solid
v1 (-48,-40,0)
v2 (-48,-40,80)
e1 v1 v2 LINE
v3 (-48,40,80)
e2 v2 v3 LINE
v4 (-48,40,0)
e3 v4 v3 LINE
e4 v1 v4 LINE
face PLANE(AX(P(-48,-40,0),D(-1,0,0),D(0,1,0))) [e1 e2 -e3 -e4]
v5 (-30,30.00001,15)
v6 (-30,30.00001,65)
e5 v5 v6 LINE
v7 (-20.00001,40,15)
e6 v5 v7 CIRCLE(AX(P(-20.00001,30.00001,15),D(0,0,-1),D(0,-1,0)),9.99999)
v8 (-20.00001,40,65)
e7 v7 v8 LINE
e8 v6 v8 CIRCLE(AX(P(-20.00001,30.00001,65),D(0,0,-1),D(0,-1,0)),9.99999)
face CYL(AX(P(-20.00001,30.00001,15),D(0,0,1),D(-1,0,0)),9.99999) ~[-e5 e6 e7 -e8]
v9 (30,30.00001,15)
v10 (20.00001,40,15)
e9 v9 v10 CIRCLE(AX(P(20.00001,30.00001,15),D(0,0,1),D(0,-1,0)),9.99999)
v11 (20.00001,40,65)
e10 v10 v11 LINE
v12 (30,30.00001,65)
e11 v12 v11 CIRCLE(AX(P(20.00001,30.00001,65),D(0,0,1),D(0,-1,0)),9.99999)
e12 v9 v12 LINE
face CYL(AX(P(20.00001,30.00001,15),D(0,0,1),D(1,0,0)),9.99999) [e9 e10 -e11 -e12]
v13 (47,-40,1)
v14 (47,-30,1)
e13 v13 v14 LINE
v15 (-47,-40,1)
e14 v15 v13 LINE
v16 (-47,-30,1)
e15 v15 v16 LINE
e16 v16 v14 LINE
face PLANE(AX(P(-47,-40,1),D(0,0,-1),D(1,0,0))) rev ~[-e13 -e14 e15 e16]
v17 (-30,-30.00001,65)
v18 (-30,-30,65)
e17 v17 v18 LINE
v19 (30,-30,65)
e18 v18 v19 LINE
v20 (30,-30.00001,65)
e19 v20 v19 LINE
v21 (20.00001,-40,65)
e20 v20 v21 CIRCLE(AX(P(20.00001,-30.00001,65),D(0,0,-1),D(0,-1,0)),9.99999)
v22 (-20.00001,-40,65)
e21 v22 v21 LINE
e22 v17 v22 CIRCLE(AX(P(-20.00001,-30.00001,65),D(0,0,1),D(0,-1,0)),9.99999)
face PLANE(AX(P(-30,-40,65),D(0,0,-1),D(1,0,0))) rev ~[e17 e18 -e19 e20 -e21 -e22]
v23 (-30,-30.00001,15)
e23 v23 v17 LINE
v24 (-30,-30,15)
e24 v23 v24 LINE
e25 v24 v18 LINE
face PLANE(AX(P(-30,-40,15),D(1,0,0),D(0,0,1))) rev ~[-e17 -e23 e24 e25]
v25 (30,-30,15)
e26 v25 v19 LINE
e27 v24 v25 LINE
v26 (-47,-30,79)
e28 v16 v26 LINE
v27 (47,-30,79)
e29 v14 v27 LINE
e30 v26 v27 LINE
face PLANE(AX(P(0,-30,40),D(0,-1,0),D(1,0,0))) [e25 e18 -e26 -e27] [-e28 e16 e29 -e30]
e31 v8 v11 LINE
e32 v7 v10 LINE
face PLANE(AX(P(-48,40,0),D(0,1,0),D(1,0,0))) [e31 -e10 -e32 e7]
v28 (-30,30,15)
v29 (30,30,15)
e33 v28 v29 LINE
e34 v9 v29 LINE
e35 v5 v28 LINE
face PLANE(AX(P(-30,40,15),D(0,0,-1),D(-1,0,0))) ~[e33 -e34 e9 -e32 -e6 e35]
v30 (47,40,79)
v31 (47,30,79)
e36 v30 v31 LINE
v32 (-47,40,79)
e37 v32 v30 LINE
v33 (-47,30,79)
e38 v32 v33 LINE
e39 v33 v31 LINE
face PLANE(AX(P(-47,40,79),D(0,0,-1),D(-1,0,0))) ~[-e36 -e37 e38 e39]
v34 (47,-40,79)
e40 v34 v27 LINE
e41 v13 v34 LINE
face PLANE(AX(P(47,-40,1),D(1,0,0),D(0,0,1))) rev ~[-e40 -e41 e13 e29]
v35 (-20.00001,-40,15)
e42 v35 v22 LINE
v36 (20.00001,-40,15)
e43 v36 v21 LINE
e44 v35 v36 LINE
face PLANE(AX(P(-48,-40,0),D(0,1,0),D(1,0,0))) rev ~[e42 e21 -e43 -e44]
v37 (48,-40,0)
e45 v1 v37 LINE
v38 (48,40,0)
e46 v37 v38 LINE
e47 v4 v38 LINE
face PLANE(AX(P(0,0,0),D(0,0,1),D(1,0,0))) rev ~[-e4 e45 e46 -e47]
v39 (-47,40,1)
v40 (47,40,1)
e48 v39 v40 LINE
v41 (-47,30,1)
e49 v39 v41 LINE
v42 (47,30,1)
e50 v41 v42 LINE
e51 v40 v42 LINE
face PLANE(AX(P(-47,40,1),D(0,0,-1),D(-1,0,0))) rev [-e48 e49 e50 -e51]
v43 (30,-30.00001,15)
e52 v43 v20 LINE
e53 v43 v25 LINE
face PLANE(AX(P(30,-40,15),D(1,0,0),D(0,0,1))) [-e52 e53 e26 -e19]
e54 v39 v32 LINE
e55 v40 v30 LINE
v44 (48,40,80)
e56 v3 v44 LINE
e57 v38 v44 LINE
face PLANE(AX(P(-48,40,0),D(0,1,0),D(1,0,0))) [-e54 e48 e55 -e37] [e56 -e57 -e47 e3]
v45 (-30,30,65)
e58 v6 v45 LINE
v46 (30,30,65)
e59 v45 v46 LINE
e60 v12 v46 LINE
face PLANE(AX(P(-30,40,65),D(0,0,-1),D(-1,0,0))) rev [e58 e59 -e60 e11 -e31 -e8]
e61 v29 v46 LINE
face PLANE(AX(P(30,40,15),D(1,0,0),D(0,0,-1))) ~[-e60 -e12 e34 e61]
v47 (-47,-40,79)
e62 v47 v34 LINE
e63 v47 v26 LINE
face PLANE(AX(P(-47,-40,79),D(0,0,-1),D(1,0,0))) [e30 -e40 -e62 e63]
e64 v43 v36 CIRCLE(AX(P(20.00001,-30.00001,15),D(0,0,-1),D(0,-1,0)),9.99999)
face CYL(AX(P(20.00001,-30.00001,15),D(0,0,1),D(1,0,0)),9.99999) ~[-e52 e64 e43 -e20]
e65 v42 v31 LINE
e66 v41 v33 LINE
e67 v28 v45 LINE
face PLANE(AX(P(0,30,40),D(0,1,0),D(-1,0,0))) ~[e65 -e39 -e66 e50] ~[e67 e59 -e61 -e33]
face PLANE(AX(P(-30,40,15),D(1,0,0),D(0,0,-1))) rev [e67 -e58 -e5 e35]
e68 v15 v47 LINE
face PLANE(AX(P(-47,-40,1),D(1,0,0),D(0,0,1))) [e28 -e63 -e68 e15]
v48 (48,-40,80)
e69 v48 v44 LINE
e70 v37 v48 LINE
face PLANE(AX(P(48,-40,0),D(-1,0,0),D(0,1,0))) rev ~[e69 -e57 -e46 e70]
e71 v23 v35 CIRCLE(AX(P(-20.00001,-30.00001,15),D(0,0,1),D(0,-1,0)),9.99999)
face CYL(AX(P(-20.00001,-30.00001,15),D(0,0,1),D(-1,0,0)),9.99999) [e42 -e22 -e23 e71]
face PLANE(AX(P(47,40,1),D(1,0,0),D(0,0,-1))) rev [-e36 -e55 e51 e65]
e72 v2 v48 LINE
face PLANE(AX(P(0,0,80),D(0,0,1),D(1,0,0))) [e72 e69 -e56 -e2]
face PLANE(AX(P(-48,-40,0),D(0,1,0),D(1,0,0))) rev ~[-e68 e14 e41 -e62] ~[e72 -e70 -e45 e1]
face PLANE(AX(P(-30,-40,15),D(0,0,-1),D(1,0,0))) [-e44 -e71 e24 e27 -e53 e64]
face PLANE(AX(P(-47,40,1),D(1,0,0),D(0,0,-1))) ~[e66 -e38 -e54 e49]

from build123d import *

# Parameters (mm, degrees)
F0_W     = 96
F0_H     = 80
F1_DEPTH = 80
F2_W     = 94
F2_H     = 78
F2_W_2   = 60
F2_H_2   = 50
F3_DEPTH = 10
F4_R     = 9.99999


# Not quite as in the source:
# - a fillet or chamfer is up to 0.001 mm smaller than in the source, because OpenCascade refuses the exact size
# - a pattern or mirror of a feature is missing from the dataset's text; its kind, count and spacing are read off the source's solid


with BuildPart() as f1:
    # F0 (on Top) → F1 (new body)
    with BuildSketch(Plane.XY):
        Rectangle(F0_W, F0_H)
    extrude(amount=F1_DEPTH)

    # F2 (on face) → F3 (cut)
    with BuildSketch(Plane.XZ.offset(40)):
        with Locations((0, 40)):
            Rectangle(F2_W, F2_H)
        with Locations((0, 40)):
            Rectangle(F2_W_2, F2_H_2, mode=Mode.SUBTRACT)
    f3 = extrude(amount=-F3_DEPTH, mode=Mode.SUBTRACT)

    # F3_copies: F3 across plane
    add(f3.mirror(Plane.ZX), mode=Mode.SUBTRACT)

    # F4 (radius 10 in the source; OpenCascade refuses exactly that, so slightly less here)
    f4_edges = [f1.edges().sort_by_distance(p)[0] for p in [
        (30, -40, 40),
        (-30, -40, 40),
        (30, 40, 40),
        (-30, 40, 40),
    ]]
    fillet(f4_edges, radius=F4_R)


solid = f1.part
